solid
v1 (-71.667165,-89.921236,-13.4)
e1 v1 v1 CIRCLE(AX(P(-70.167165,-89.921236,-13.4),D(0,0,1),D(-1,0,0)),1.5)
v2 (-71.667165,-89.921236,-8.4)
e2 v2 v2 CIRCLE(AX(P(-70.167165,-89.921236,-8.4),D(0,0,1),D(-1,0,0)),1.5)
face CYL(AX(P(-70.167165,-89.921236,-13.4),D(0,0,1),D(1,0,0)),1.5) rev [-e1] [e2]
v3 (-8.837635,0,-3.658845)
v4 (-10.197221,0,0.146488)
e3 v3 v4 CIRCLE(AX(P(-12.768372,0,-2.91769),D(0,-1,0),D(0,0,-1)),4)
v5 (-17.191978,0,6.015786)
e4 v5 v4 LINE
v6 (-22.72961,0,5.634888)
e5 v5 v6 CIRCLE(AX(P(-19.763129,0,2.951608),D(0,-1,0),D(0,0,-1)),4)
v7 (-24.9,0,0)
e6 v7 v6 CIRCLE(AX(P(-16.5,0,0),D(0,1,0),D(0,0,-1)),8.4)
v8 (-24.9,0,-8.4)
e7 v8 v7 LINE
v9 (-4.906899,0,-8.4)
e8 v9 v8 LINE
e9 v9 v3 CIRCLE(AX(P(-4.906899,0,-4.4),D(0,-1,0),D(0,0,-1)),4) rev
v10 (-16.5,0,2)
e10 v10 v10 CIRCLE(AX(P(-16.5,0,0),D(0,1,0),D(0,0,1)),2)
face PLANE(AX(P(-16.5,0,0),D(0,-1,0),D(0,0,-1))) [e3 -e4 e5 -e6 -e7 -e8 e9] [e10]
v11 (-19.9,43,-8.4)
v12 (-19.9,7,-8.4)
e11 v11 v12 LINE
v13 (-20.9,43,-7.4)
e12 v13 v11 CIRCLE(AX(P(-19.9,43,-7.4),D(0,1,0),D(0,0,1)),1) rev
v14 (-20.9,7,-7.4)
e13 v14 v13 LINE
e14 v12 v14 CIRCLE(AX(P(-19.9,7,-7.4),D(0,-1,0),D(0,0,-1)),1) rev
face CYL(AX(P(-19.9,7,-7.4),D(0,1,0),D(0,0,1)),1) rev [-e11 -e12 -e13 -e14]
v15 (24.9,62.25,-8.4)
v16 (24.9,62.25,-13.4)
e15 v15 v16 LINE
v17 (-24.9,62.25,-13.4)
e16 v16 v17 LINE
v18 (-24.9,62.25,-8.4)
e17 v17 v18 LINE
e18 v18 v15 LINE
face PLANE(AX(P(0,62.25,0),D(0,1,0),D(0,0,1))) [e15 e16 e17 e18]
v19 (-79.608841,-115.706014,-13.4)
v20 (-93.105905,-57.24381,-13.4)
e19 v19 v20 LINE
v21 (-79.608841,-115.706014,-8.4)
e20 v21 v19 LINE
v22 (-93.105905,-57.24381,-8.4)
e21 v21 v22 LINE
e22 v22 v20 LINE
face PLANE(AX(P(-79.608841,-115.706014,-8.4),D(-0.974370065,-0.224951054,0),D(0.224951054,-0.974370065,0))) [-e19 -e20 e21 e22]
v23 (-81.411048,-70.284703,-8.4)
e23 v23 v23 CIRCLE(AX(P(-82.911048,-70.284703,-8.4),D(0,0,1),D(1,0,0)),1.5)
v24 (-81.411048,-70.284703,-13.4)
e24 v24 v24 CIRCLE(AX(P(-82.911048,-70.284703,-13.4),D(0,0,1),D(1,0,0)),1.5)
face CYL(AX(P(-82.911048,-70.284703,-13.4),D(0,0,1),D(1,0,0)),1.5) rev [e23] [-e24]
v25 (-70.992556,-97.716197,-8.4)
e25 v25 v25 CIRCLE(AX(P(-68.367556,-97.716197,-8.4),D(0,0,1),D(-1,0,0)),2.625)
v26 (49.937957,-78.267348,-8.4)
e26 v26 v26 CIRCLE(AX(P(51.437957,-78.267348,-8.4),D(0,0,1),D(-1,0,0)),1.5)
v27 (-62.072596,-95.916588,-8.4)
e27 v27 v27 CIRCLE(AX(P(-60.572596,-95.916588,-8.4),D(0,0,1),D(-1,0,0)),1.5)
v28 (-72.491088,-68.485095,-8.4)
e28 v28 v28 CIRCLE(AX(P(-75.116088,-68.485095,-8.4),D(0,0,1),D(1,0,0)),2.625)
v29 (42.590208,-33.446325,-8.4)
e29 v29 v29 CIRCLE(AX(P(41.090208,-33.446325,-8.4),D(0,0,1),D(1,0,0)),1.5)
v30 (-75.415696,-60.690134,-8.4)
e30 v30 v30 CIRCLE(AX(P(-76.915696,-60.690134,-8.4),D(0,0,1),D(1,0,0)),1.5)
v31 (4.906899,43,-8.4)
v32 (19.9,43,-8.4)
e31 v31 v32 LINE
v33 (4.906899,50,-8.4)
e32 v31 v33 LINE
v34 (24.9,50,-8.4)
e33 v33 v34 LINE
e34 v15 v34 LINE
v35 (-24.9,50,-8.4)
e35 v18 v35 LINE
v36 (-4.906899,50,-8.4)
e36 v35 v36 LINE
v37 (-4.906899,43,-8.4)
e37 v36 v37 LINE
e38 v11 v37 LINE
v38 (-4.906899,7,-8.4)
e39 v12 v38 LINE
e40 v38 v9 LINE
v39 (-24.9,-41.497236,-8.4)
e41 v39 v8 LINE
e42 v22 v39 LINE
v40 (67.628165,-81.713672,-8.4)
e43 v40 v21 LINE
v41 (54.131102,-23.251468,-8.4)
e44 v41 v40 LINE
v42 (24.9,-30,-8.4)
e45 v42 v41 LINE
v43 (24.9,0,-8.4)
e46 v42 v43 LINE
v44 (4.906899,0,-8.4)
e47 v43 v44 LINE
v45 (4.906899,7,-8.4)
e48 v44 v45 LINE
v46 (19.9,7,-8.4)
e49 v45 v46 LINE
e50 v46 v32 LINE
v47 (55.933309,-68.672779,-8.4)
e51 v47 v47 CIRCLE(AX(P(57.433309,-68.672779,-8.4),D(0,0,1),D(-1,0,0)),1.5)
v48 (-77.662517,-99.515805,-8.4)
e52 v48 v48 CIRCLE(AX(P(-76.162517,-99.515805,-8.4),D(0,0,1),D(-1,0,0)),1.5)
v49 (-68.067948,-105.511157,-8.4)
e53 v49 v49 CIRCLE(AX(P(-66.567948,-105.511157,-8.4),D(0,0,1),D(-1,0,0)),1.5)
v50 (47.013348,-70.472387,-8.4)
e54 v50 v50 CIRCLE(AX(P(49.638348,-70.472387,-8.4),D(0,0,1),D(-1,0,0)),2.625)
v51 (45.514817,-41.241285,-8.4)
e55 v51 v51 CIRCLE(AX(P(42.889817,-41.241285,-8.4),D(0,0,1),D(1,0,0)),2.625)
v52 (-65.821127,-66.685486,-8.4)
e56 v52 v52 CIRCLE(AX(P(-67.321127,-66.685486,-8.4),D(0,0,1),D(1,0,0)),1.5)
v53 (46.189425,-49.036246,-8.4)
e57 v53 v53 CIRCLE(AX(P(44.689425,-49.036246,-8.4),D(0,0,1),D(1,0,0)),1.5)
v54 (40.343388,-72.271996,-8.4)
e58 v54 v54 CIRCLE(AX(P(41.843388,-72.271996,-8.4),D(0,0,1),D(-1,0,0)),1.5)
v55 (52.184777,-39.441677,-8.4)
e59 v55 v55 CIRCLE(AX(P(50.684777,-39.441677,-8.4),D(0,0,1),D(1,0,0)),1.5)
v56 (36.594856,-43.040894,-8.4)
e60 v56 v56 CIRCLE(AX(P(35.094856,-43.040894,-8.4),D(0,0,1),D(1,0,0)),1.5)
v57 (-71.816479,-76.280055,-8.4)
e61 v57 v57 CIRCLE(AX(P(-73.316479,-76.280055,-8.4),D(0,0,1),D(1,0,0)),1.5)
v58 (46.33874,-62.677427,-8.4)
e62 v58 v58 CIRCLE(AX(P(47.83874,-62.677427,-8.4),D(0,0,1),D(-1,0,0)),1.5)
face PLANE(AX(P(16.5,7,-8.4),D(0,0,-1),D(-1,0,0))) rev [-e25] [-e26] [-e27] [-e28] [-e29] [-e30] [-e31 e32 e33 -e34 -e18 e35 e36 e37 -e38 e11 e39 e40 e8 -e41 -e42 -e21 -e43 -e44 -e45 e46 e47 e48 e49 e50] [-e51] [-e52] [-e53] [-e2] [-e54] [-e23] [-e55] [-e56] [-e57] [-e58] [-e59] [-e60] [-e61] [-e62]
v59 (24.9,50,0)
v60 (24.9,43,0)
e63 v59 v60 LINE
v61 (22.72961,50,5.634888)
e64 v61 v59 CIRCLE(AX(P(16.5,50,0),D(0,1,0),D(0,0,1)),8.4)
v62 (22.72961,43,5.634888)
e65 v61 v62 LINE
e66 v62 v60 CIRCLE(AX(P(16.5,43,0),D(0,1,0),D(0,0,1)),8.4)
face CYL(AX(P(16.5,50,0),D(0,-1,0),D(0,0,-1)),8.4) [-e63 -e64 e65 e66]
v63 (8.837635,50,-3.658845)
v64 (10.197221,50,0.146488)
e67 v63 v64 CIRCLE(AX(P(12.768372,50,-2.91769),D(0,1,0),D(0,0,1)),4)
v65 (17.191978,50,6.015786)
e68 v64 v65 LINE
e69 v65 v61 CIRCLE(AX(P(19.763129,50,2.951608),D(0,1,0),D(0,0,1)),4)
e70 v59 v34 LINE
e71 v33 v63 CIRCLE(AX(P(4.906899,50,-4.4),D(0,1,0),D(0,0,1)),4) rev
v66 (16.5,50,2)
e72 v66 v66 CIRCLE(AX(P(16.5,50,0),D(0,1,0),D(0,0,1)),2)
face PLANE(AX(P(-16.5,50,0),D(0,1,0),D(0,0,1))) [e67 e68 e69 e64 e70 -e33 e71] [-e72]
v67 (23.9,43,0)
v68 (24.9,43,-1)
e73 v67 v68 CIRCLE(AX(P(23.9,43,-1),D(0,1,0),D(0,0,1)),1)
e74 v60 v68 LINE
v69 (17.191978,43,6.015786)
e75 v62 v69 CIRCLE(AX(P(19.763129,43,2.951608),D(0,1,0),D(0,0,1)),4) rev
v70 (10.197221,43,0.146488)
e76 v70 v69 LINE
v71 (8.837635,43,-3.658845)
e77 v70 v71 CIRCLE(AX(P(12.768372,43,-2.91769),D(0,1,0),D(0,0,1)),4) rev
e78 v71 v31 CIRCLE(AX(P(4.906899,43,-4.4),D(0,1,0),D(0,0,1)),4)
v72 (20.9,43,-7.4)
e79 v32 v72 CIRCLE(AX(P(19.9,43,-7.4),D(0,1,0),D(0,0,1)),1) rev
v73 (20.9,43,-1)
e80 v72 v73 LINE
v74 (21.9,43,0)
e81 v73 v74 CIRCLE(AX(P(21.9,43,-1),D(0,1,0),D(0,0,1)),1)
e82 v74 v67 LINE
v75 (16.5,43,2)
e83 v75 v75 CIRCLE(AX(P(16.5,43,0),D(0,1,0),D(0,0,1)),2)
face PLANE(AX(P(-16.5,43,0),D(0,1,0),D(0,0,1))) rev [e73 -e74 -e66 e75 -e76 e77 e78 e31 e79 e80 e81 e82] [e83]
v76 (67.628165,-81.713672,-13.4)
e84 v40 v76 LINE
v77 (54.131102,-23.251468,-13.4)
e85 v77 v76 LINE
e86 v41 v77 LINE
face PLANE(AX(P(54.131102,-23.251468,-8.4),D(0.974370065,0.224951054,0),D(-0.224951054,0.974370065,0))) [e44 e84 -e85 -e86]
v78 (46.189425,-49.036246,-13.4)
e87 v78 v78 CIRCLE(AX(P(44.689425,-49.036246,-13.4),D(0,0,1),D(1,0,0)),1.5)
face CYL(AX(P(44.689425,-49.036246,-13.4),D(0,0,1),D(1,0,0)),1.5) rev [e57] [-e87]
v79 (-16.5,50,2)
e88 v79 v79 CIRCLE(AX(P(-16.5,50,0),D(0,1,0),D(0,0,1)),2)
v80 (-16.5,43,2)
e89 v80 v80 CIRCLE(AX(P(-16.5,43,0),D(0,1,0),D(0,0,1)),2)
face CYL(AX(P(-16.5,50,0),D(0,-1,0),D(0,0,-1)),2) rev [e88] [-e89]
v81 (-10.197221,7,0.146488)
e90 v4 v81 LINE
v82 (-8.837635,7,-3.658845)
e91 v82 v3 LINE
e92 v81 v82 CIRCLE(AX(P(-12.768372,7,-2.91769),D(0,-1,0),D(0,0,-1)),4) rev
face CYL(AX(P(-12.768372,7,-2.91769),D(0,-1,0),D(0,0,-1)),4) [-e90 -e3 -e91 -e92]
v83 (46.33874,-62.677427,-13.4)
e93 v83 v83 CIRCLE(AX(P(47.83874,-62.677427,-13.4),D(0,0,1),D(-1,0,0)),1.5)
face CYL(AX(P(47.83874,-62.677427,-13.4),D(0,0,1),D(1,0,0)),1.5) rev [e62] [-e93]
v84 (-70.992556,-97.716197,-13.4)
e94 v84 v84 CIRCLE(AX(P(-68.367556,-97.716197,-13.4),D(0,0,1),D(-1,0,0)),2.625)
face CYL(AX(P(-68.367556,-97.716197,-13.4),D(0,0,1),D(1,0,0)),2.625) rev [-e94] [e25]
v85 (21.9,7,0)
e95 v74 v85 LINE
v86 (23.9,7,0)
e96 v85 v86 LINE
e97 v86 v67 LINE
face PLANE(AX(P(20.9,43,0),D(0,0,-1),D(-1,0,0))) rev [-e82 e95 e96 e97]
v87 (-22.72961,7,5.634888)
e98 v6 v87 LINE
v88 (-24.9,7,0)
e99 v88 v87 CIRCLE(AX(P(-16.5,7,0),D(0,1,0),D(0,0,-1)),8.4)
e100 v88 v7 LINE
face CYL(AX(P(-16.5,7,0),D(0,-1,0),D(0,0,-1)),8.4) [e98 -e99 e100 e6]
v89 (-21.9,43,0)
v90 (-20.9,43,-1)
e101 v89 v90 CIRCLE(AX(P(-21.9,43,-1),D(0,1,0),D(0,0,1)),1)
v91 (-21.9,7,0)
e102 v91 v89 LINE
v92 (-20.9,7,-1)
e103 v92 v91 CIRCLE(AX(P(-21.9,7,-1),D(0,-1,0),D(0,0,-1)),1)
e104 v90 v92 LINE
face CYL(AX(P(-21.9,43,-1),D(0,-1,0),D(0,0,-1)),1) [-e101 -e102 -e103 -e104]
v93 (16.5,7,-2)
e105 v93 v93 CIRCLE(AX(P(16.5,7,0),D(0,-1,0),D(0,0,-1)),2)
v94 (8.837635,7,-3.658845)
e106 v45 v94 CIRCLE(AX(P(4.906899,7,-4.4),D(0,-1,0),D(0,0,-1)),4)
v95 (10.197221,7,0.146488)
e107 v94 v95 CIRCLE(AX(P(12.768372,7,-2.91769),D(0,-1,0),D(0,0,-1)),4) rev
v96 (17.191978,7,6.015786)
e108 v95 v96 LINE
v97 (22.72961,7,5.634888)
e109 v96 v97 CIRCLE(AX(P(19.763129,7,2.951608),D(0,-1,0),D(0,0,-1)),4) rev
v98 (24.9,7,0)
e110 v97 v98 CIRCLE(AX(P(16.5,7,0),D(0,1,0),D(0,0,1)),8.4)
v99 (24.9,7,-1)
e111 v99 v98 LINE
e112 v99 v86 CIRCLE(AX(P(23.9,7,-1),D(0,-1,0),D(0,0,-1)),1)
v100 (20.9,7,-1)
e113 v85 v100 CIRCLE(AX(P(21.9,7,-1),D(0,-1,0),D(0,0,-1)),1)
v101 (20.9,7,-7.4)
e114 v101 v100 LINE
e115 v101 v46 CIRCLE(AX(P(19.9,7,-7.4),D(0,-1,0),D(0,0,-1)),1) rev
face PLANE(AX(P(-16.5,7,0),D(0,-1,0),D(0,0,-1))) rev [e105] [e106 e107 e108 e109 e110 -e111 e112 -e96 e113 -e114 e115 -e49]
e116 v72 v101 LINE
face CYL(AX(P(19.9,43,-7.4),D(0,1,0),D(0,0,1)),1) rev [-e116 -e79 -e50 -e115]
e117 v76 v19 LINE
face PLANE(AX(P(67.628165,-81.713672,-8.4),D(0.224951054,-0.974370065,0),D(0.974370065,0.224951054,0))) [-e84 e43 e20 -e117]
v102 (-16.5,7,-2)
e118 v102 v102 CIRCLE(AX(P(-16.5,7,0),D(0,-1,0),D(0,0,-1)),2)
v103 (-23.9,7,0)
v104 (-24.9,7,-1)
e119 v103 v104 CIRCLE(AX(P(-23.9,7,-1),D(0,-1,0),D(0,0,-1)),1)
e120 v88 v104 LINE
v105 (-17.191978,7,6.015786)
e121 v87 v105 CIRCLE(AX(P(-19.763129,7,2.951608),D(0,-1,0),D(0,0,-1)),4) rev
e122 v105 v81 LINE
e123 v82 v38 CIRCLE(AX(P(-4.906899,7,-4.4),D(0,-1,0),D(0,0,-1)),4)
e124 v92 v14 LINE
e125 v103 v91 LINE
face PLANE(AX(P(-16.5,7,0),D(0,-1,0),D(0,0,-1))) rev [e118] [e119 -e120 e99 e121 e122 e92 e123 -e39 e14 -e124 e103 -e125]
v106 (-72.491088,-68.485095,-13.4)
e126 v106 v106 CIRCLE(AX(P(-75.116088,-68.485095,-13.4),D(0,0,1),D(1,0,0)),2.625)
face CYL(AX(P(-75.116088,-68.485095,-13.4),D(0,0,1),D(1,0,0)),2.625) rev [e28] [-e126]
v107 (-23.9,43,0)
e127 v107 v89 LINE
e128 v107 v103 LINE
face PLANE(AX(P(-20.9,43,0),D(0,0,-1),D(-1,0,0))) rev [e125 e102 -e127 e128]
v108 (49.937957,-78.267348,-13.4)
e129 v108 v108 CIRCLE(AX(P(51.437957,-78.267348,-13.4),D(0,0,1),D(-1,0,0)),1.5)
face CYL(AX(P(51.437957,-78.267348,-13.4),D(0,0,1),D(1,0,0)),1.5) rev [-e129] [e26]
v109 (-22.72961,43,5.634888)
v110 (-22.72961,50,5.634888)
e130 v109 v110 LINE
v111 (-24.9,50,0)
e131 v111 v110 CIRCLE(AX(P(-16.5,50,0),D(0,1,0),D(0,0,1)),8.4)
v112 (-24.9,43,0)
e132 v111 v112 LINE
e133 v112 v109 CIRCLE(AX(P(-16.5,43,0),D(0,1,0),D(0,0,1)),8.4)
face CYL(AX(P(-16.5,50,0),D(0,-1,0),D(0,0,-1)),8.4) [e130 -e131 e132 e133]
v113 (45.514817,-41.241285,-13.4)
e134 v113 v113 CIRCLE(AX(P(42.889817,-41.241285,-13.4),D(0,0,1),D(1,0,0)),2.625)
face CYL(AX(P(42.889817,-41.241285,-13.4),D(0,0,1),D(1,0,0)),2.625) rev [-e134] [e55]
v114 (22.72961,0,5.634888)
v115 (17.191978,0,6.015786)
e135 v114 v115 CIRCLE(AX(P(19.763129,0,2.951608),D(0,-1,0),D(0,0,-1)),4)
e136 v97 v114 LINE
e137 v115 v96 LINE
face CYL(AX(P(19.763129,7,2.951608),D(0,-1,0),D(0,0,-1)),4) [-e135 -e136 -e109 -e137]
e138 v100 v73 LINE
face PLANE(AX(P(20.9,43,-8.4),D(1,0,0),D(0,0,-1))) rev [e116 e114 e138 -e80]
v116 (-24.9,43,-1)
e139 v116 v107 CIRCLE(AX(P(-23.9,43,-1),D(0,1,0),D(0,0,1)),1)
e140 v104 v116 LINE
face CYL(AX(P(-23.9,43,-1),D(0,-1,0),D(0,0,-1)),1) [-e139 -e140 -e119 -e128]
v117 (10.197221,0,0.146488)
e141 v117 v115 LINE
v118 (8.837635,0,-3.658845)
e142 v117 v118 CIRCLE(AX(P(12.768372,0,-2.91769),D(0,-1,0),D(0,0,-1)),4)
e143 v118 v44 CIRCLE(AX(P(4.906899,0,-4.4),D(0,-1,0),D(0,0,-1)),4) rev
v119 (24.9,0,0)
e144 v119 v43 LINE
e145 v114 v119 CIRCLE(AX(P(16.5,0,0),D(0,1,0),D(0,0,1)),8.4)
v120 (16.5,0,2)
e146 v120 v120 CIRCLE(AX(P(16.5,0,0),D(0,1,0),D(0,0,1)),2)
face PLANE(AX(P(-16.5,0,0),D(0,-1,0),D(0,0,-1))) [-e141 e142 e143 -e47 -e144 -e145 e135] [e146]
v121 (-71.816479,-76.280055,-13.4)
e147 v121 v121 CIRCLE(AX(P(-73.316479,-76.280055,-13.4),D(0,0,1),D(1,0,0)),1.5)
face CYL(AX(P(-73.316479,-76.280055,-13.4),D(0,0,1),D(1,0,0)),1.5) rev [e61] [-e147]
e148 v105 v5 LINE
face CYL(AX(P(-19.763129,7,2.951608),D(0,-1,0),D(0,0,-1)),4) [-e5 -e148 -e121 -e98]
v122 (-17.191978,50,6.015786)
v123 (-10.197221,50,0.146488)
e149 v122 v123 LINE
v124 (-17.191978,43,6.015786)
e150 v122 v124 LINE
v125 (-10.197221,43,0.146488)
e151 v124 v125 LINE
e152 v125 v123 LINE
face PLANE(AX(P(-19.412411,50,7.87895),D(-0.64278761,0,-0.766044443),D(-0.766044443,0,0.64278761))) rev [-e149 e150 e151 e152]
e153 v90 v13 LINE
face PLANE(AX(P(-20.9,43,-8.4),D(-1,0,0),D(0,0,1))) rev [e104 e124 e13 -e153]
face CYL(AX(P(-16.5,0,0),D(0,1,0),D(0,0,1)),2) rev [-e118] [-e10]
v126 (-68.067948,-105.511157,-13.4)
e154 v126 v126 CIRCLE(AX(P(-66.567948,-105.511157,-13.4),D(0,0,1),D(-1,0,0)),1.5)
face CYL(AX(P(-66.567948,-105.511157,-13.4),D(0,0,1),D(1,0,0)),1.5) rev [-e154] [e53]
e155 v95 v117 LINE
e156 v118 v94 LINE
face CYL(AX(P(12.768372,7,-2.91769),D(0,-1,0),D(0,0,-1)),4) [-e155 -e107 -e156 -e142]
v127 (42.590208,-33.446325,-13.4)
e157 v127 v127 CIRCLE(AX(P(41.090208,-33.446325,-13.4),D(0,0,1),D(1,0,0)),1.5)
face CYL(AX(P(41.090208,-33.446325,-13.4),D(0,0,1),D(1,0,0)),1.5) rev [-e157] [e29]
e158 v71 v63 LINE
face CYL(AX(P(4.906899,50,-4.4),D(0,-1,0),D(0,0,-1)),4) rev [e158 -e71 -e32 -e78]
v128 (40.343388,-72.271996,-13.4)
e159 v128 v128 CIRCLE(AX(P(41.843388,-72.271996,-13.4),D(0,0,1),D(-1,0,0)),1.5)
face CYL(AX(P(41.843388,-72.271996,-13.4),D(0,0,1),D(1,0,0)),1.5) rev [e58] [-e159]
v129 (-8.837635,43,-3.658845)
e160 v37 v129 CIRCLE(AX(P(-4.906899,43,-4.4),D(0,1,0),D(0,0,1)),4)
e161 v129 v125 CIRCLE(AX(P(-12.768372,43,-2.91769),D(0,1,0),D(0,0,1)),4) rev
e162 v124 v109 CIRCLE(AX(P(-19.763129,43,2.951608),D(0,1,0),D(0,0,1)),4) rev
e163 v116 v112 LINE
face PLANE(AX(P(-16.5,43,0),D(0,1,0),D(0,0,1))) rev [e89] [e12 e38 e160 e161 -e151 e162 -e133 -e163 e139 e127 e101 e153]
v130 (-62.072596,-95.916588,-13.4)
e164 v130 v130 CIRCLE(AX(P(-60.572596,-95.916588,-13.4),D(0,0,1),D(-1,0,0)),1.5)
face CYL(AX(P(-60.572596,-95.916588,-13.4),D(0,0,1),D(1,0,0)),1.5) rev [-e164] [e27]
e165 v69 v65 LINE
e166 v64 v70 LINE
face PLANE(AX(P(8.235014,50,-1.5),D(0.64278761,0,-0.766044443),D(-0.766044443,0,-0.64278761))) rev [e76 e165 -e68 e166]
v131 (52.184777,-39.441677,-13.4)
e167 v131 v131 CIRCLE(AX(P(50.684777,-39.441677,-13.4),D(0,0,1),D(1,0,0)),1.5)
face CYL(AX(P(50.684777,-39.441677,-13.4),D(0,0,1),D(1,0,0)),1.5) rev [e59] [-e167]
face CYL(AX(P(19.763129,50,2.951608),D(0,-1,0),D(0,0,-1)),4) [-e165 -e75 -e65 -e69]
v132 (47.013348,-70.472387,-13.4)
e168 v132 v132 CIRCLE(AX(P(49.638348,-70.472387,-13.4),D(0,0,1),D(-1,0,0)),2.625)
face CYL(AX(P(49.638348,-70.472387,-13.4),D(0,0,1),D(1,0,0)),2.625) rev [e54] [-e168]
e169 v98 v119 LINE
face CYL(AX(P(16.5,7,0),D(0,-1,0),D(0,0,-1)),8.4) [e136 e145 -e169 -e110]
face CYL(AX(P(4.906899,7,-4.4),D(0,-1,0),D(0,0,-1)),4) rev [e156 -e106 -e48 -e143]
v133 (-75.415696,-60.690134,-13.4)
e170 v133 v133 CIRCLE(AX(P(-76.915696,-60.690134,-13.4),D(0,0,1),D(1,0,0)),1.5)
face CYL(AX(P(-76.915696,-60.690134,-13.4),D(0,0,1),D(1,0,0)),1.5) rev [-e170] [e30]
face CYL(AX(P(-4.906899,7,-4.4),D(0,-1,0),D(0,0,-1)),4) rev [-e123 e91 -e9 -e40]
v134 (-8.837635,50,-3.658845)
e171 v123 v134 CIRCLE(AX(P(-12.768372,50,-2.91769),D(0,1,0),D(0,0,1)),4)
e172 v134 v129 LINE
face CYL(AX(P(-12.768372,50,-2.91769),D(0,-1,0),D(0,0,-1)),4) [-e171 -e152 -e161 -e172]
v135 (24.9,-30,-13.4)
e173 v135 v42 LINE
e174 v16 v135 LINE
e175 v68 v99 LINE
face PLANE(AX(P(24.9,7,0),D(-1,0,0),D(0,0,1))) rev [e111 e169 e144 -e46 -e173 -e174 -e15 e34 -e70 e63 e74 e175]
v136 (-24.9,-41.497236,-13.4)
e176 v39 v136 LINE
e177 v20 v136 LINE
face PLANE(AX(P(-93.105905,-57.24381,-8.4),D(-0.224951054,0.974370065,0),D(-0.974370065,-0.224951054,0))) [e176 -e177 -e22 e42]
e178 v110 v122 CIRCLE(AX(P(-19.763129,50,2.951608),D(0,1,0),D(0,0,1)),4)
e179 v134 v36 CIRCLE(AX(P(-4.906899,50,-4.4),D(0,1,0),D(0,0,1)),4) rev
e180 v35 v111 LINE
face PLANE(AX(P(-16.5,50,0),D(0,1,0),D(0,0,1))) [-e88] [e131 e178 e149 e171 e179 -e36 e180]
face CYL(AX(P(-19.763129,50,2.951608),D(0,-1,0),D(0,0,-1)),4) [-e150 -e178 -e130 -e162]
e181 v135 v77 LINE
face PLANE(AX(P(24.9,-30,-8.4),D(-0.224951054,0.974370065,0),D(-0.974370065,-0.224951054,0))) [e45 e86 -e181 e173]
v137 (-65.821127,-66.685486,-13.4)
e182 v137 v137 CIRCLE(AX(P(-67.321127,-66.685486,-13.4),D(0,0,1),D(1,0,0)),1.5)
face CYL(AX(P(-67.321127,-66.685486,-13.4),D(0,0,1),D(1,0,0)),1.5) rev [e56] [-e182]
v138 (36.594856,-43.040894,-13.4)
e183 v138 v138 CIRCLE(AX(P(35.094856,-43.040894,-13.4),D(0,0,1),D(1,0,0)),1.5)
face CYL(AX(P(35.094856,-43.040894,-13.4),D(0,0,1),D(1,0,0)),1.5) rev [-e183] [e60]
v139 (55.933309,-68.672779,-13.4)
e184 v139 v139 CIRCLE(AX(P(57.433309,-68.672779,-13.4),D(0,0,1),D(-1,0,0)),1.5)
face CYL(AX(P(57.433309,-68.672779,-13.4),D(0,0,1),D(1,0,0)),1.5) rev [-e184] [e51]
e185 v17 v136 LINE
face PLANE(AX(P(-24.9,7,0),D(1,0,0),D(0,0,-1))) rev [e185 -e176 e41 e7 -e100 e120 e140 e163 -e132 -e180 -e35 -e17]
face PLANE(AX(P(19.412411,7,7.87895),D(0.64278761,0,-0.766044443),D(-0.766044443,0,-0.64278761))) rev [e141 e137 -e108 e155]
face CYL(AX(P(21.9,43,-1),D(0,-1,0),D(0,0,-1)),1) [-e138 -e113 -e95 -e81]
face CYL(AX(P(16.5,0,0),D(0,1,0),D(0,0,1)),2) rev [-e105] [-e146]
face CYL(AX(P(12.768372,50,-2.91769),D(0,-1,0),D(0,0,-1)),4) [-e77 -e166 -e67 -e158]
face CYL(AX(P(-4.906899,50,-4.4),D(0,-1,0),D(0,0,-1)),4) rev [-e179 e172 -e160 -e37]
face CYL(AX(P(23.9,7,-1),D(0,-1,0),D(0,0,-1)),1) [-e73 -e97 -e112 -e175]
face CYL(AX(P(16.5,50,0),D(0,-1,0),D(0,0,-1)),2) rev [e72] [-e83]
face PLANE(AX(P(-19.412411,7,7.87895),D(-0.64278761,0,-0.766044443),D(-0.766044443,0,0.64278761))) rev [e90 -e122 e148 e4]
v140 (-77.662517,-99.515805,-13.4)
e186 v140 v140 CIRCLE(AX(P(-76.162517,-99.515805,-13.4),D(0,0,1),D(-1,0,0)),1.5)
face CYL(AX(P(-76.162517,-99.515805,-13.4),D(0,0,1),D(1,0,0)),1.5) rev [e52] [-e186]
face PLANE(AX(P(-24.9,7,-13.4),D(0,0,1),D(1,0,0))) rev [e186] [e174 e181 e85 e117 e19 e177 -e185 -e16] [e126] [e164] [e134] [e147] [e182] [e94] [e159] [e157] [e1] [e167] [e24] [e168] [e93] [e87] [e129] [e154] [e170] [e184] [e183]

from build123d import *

# Parameters (mm, degrees)
BOSS_EXTRUDE2_DEPTH     = 7
CUT_EXTRUDE2_DEPTH      = 30.130224853
CUT_EXTRUDE2_DEPTH_BACK = 30.130224853
SKETCH3_R               = 2
BOSS_EXTRUDE3_DEPTH     = 36
SKETCH5_R               = 2
BOSS_EXTRUDE4_DEPTH     = 7
SKETCH13_W              = 49.8
SKETCH13_H              = 5
BOSS_EXTRUDE6_DEPTH     = 12.25
SKETCH15_W              = 49.8
SKETCH15_H              = 5
BOSS_EXTRUDE7_DEPTH     = 30
BOSS_EXTRUDE8_DEPTH     = 5
FILLET1_DEPTH           = 50
FILLET1_2_DEPTH         = 7
FILLET1_START           = 43
FILLET1_3_DEPTH         = 7
FILLET2_R               = 4
FILLET3_R               = 1
CUT_EXTRUDE3_DEPTH      = 150.305937317
CUT_EXTRUDE3_DEPTH_BACK = 150.305937317
SKETCH16_R              = 1.5
SKETCH16_R_2            = 2.625


with BuildPart() as part:
    # Sketch1 → Boss-Extrude2 (new body)
    with BuildSketch(Plane(origin=(0, 0, 0), x_dir=(1, 0, 0), z_dir=(0, 1, 0))):
        with BuildLine():
            Line((-24.9, 0), (-24.9, 13.4))
            Line((-24.9, 13.4), (24.9, 13.4))
            Line((24.9, 13.4), (24.9, 0))
            ThreePointArc((24.9, 0), (23.392904185, -4.800819919), (19.412411454, -7.878950407))
            Line((19.412411454, -7.878950407), (8.235013612, 1.5))
            ThreePointArc((8.235013612, 1.5), (11.116692467, 6.448255578), (16.5, 8.4))
            Line((16.5, 8.4), (-16.5, 8.4))
            ThreePointArc((-16.5, 8.4), (-11.116692467, 6.448255578), (-8.235013612, 1.5))
            Line((-8.235013612, 1.5), (-19.412411454, -7.878950407))
            ThreePointArc((-19.412411454, -7.878950407), (-23.392904185, -4.800819919), (-24.9, 0))
        make_face()
    extrude(amount=BOSS_EXTRUDE2_DEPTH)

    # Sketch3 → Cut-Extrude2 (cut, two sides: drawn at the far end of the back side and taken through both)
    with BuildSketch(Plane(origin=(0, 7, 0), x_dir=(1, 0, 0), z_dir=(0, 1, 0)).offset(-CUT_EXTRUDE2_DEPTH_BACK)):
        with Locations(Location((-16.5, 0, 0), (0, 0, 270))):
            Circle(SKETCH3_R)
        with Locations(Location((16.5, 0, 0), (0, 0, 270))):
            Circle(SKETCH3_R)
    extrude(amount=CUT_EXTRUDE2_DEPTH + CUT_EXTRUDE2_DEPTH_BACK, mode=Mode.SUBTRACT)

    # Sketch4 → Boss-Extrude3 (add)
    with BuildSketch(Plane(origin=(0, 7, 0), x_dir=(1, 0, 0), z_dir=(0, 1, 0))):
        Polygon((-24.9, 13.4), (-24.9, 0), (-20.9, 0), (-20.9, 8.4), (-16.5, 8.4), (16.5, 8.4), (20.9, 8.4), (20.9, 0), (24.9, 0), (24.9, 13.4), align=None)
    extrude(amount=BOSS_EXTRUDE3_DEPTH)

    # Sketch5 → Boss-Extrude4 (add)
    with BuildSketch(Plane(origin=(0, 43, 0), x_dir=(1, 0, 0), z_dir=(0, 1, 0))):
        with BuildLine():
            Line((-24.9, 13.4), (-24.9, 0))
            ThreePointArc((-24.9, 0), (-23.392904185, -4.800819919), (-19.412411454, -7.878950407))
            Line((-19.412411454, -7.878950407), (-8.235013612, 1.5))
            ThreePointArc((-8.235013612, 1.5), (-11.116692467, 6.448255578), (-16.5, 8.4))
            Line((-16.5, 8.4), (16.5, 8.4))
            ThreePointArc((16.5, 8.4), (11.116692467, 6.448255578), (8.235013612, 1.5))
            Line((8.235013612, 1.5), (19.412411454, -7.878950407))
            ThreePointArc((19.412411454, -7.878950407), (23.392904185, -4.800819919), (24.9, 0))
            Line((24.9, 0), (24.9, 13.4))
            Line((24.9, 13.4), (-24.9, 13.4))
        make_face()
        with Locations(Location((16.5, 0, 0), (0, 0, 270))):
            Circle(SKETCH5_R, mode=Mode.SUBTRACT)
        with Locations(Location((-16.5, 0, 0), (0, 0, 270))):
            Circle(SKETCH5_R, mode=Mode.SUBTRACT)
    extrude(amount=BOSS_EXTRUDE4_DEPTH)

    # Sketch13 → Boss-Extrude6 (add)
    with BuildSketch(Plane(origin=(0, 50, 0), x_dir=(1, 0, 0), z_dir=(0, 1, 0))):
        with Locations((0, 10.9)):
            Rectangle(SKETCH13_W, SKETCH13_H)
    extrude(amount=BOSS_EXTRUDE6_DEPTH)

    # Sketch15 → Boss-Extrude7 (add)
    with BuildSketch(Plane.XZ):
        with Locations((0, -10.9)):
            Rectangle(SKETCH15_W, SKETCH15_H)
    extrude(amount=BOSS_EXTRUDE7_DEPTH)

    # Sketch12 → Boss-Extrude8 (add)
    with BuildSketch(Plane(origin=(0, 0, -13.4), x_dir=(-1, 0, 0), z_dir=(0, 0, -1))):
        Polygon((24.9, -30), (24.9, -41.497235918), (93.105904535, -57.243809722), (79.608841274, -115.706013609), (-67.628165204, -81.713672257), (-54.131101944, -23.25146837), (-24.9, -30), align=None)
    extrude(amount=-BOSS_EXTRUDE8_DEPTH)

    # Fillet1: read off the stored shape, not the designer's step
    # Fillet1 outline → Fillet1 (cut)
    with BuildSketch(Plane(origin=(0, 0, 0), x_dir=(1, 0, 0), z_dir=(0, 1, 0))):
        with BuildLine():
            Line((-19.412411454, -7.878950407), (-17.191978394, -6.015785846))
            ThreePointArc((-17.191978394, -6.015785846), (-20.037614317, -6.942179175), (-22.729609591, -5.63488814))
            ThreePointArc((-22.729609591, -5.63488814), (-21.206707029, -6.957507379), (-19.412411454, -7.878950407))
        make_face()
        with BuildLine():
            ThreePointArc((22.729609591, -5.63488814), (20.037614317, -6.942179175), (17.191978394, -6.015785846))
            Line((17.191978394, -6.015785846), (19.412411454, -7.878950407))
            ThreePointArc((19.412411454, -7.878950407), (21.206707029, -6.957507379), (22.729609591, -5.63488814))
        make_face()
    extrude(amount=FILLET1_DEPTH, mode=Mode.SUBTRACT)

    # Fillet1 2 outline → Fillet1 2 (add)
    with BuildSketch(Plane(origin=(0, 0, 0), x_dir=(1, 0, 0), z_dir=(0, 1, 0))):
        with BuildLine():
            Line((16.5, 8.4), (4.906898603, 8.4))
            ThreePointArc((4.906898603, 8.4), (8.19911817, 6.671847337), (8.646608731, 2.980645161))
            ThreePointArc((8.646608731, 2.980645161), (11.729120592, 6.91366109), (16.5, 8.4))
        make_face()
        with BuildLine():
            ThreePointArc((-16.5, 8.4), (-11.729120592, 6.91366109), (-8.646608731, 2.980645161))
            ThreePointArc((-8.646608731, 2.980645161), (-8.19911817, 6.671847337), (-4.906898603, 8.4))
            Line((-4.906898603, 8.4), (-16.5, 8.4))
        make_face()
    extrude(amount=FILLET1_2_DEPTH)

    # Fillet1 3 outline → Fillet1 3 (add)
    with BuildSketch(Plane(origin=(0, 0, 0), x_dir=(1, 0, 0), z_dir=(0, 1, 0)).offset(FILLET1_START)):
        with BuildLine():
            Line((16.5, 8.4), (4.906898603, 8.4))
            ThreePointArc((4.906898603, 8.4), (8.19911817, 6.671847337), (8.646608731, 2.980645161))
            ThreePointArc((8.646608731, 2.980645161), (11.729120592, 6.91366109), (16.5, 8.4))
        make_face()
        with BuildLine():
            ThreePointArc((-16.5, 8.4), (-11.729120592, 6.91366109), (-8.646608731, 2.980645161))
            ThreePointArc((-8.646608731, 2.980645161), (-8.19911817, 6.671847337), (-4.906898603, 8.4))
            Line((-4.906898603, 8.4), (-16.5, 8.4))
        make_face()
    extrude(amount=FILLET1_3_DEPTH)

    # Fillet2
    fillet2_edges = [part.edges().sort_by_distance(p)[0] for p in [
        (-8.235013612, 3.5, -1.5),
        (8.235013612, 3.5, -1.5),
        (8.235013612, 46.5, -1.5),
        (-8.235013612, 46.5, -1.5),
    ]]
    fillet(fillet2_edges, radius=FILLET2_R)

    # Fillet3
    fillet3_edges = [part.edges().sort_by_distance(p)[0] for p in [
        (-24.9, 25, 0),
        (-20.9, 25, 0),
        (-20.9, 25, -8.4),
        (20.9, 25, -8.4),
        (20.9, 25, 0),
        (24.9, 25, 0),
    ]]
    fillet(fillet3_edges, radius=FILLET3_R)

    # Sketch16 → Cut-Extrude3 (cut, two sides: drawn at the far end of the back side and taken through both)
    with BuildSketch(Plane.XY.offset(-8.4).offset(-CUT_EXTRUDE3_DEPTH_BACK)):
        with Locations((50.684777305, -39.441676722)):
            Circle(SKETCH16_R)
        with Locations((42.889816787, -41.241285157)):
            Circle(SKETCH16_R_2)
        with Locations((44.689425222, -49.036245675)):
            Circle(SKETCH16_R)
        with Locations((35.094856269, -43.040893591)):
            Circle(SKETCH16_R)
        with Locations((41.090208352, -33.446324638)):
            Circle(SKETCH16_R)
        with Locations((-82.911048266, -70.284703313)):
            Circle(SKETCH16_R)
        with Locations((-76.915696183, -60.69013436)):
            Circle(SKETCH16_R)
        with Locations((-67.32112723, -66.685486444)):
            Circle(SKETCH16_R)
        with Locations((-73.316479313, -76.280055397)):
            Circle(SKETCH16_R)
        with Locations((-75.116087748, -68.485094879)):
            Circle(SKETCH16_R_2)
        with Locations(Location((47.838739983, -62.677426582, 0), (0, 0, 180))):
            Circle(SKETCH16_R)
        with Locations(Location((57.433308936, -68.672778665, 0), (0, 0, 180))):
            Circle(SKETCH16_R)
        with Locations(Location((41.843387899, -72.271995535, 0), (0, 0, 180))):
            Circle(SKETCH16_R)
        with Locations(Location((49.638348417, -70.4723871, 0), (0, 0, 180))):
            Circle(SKETCH16_R_2)
        with Locations(Location((51.437956852, -78.267347618, 0), (0, 0, 180))):
            Circle(SKETCH16_R)
        with Locations(Location((-76.162516636, -99.515805257, 0), (0, 0, 180))):
            Circle(SKETCH16_R)
        with Locations(Location((-66.567947683, -105.511157341, 0), (0, 0, 180))):
            Circle(SKETCH16_R)
        with Locations(Location((-60.572595599, -95.916588388, 0), (0, 0, 180))):
            Circle(SKETCH16_R)
        with Locations(Location((-68.367556118, -97.716196822, 0), (0, 0, 180))):
            Circle(SKETCH16_R_2)
        with Locations(Location((-70.167164552, -89.921236304, 0), (0, 0, 180))):
            Circle(SKETCH16_R)
    extrude(amount=CUT_EXTRUDE3_DEPTH + CUT_EXTRUDE3_DEPTH_BACK, mode=Mode.SUBTRACT)


solid = part.part
